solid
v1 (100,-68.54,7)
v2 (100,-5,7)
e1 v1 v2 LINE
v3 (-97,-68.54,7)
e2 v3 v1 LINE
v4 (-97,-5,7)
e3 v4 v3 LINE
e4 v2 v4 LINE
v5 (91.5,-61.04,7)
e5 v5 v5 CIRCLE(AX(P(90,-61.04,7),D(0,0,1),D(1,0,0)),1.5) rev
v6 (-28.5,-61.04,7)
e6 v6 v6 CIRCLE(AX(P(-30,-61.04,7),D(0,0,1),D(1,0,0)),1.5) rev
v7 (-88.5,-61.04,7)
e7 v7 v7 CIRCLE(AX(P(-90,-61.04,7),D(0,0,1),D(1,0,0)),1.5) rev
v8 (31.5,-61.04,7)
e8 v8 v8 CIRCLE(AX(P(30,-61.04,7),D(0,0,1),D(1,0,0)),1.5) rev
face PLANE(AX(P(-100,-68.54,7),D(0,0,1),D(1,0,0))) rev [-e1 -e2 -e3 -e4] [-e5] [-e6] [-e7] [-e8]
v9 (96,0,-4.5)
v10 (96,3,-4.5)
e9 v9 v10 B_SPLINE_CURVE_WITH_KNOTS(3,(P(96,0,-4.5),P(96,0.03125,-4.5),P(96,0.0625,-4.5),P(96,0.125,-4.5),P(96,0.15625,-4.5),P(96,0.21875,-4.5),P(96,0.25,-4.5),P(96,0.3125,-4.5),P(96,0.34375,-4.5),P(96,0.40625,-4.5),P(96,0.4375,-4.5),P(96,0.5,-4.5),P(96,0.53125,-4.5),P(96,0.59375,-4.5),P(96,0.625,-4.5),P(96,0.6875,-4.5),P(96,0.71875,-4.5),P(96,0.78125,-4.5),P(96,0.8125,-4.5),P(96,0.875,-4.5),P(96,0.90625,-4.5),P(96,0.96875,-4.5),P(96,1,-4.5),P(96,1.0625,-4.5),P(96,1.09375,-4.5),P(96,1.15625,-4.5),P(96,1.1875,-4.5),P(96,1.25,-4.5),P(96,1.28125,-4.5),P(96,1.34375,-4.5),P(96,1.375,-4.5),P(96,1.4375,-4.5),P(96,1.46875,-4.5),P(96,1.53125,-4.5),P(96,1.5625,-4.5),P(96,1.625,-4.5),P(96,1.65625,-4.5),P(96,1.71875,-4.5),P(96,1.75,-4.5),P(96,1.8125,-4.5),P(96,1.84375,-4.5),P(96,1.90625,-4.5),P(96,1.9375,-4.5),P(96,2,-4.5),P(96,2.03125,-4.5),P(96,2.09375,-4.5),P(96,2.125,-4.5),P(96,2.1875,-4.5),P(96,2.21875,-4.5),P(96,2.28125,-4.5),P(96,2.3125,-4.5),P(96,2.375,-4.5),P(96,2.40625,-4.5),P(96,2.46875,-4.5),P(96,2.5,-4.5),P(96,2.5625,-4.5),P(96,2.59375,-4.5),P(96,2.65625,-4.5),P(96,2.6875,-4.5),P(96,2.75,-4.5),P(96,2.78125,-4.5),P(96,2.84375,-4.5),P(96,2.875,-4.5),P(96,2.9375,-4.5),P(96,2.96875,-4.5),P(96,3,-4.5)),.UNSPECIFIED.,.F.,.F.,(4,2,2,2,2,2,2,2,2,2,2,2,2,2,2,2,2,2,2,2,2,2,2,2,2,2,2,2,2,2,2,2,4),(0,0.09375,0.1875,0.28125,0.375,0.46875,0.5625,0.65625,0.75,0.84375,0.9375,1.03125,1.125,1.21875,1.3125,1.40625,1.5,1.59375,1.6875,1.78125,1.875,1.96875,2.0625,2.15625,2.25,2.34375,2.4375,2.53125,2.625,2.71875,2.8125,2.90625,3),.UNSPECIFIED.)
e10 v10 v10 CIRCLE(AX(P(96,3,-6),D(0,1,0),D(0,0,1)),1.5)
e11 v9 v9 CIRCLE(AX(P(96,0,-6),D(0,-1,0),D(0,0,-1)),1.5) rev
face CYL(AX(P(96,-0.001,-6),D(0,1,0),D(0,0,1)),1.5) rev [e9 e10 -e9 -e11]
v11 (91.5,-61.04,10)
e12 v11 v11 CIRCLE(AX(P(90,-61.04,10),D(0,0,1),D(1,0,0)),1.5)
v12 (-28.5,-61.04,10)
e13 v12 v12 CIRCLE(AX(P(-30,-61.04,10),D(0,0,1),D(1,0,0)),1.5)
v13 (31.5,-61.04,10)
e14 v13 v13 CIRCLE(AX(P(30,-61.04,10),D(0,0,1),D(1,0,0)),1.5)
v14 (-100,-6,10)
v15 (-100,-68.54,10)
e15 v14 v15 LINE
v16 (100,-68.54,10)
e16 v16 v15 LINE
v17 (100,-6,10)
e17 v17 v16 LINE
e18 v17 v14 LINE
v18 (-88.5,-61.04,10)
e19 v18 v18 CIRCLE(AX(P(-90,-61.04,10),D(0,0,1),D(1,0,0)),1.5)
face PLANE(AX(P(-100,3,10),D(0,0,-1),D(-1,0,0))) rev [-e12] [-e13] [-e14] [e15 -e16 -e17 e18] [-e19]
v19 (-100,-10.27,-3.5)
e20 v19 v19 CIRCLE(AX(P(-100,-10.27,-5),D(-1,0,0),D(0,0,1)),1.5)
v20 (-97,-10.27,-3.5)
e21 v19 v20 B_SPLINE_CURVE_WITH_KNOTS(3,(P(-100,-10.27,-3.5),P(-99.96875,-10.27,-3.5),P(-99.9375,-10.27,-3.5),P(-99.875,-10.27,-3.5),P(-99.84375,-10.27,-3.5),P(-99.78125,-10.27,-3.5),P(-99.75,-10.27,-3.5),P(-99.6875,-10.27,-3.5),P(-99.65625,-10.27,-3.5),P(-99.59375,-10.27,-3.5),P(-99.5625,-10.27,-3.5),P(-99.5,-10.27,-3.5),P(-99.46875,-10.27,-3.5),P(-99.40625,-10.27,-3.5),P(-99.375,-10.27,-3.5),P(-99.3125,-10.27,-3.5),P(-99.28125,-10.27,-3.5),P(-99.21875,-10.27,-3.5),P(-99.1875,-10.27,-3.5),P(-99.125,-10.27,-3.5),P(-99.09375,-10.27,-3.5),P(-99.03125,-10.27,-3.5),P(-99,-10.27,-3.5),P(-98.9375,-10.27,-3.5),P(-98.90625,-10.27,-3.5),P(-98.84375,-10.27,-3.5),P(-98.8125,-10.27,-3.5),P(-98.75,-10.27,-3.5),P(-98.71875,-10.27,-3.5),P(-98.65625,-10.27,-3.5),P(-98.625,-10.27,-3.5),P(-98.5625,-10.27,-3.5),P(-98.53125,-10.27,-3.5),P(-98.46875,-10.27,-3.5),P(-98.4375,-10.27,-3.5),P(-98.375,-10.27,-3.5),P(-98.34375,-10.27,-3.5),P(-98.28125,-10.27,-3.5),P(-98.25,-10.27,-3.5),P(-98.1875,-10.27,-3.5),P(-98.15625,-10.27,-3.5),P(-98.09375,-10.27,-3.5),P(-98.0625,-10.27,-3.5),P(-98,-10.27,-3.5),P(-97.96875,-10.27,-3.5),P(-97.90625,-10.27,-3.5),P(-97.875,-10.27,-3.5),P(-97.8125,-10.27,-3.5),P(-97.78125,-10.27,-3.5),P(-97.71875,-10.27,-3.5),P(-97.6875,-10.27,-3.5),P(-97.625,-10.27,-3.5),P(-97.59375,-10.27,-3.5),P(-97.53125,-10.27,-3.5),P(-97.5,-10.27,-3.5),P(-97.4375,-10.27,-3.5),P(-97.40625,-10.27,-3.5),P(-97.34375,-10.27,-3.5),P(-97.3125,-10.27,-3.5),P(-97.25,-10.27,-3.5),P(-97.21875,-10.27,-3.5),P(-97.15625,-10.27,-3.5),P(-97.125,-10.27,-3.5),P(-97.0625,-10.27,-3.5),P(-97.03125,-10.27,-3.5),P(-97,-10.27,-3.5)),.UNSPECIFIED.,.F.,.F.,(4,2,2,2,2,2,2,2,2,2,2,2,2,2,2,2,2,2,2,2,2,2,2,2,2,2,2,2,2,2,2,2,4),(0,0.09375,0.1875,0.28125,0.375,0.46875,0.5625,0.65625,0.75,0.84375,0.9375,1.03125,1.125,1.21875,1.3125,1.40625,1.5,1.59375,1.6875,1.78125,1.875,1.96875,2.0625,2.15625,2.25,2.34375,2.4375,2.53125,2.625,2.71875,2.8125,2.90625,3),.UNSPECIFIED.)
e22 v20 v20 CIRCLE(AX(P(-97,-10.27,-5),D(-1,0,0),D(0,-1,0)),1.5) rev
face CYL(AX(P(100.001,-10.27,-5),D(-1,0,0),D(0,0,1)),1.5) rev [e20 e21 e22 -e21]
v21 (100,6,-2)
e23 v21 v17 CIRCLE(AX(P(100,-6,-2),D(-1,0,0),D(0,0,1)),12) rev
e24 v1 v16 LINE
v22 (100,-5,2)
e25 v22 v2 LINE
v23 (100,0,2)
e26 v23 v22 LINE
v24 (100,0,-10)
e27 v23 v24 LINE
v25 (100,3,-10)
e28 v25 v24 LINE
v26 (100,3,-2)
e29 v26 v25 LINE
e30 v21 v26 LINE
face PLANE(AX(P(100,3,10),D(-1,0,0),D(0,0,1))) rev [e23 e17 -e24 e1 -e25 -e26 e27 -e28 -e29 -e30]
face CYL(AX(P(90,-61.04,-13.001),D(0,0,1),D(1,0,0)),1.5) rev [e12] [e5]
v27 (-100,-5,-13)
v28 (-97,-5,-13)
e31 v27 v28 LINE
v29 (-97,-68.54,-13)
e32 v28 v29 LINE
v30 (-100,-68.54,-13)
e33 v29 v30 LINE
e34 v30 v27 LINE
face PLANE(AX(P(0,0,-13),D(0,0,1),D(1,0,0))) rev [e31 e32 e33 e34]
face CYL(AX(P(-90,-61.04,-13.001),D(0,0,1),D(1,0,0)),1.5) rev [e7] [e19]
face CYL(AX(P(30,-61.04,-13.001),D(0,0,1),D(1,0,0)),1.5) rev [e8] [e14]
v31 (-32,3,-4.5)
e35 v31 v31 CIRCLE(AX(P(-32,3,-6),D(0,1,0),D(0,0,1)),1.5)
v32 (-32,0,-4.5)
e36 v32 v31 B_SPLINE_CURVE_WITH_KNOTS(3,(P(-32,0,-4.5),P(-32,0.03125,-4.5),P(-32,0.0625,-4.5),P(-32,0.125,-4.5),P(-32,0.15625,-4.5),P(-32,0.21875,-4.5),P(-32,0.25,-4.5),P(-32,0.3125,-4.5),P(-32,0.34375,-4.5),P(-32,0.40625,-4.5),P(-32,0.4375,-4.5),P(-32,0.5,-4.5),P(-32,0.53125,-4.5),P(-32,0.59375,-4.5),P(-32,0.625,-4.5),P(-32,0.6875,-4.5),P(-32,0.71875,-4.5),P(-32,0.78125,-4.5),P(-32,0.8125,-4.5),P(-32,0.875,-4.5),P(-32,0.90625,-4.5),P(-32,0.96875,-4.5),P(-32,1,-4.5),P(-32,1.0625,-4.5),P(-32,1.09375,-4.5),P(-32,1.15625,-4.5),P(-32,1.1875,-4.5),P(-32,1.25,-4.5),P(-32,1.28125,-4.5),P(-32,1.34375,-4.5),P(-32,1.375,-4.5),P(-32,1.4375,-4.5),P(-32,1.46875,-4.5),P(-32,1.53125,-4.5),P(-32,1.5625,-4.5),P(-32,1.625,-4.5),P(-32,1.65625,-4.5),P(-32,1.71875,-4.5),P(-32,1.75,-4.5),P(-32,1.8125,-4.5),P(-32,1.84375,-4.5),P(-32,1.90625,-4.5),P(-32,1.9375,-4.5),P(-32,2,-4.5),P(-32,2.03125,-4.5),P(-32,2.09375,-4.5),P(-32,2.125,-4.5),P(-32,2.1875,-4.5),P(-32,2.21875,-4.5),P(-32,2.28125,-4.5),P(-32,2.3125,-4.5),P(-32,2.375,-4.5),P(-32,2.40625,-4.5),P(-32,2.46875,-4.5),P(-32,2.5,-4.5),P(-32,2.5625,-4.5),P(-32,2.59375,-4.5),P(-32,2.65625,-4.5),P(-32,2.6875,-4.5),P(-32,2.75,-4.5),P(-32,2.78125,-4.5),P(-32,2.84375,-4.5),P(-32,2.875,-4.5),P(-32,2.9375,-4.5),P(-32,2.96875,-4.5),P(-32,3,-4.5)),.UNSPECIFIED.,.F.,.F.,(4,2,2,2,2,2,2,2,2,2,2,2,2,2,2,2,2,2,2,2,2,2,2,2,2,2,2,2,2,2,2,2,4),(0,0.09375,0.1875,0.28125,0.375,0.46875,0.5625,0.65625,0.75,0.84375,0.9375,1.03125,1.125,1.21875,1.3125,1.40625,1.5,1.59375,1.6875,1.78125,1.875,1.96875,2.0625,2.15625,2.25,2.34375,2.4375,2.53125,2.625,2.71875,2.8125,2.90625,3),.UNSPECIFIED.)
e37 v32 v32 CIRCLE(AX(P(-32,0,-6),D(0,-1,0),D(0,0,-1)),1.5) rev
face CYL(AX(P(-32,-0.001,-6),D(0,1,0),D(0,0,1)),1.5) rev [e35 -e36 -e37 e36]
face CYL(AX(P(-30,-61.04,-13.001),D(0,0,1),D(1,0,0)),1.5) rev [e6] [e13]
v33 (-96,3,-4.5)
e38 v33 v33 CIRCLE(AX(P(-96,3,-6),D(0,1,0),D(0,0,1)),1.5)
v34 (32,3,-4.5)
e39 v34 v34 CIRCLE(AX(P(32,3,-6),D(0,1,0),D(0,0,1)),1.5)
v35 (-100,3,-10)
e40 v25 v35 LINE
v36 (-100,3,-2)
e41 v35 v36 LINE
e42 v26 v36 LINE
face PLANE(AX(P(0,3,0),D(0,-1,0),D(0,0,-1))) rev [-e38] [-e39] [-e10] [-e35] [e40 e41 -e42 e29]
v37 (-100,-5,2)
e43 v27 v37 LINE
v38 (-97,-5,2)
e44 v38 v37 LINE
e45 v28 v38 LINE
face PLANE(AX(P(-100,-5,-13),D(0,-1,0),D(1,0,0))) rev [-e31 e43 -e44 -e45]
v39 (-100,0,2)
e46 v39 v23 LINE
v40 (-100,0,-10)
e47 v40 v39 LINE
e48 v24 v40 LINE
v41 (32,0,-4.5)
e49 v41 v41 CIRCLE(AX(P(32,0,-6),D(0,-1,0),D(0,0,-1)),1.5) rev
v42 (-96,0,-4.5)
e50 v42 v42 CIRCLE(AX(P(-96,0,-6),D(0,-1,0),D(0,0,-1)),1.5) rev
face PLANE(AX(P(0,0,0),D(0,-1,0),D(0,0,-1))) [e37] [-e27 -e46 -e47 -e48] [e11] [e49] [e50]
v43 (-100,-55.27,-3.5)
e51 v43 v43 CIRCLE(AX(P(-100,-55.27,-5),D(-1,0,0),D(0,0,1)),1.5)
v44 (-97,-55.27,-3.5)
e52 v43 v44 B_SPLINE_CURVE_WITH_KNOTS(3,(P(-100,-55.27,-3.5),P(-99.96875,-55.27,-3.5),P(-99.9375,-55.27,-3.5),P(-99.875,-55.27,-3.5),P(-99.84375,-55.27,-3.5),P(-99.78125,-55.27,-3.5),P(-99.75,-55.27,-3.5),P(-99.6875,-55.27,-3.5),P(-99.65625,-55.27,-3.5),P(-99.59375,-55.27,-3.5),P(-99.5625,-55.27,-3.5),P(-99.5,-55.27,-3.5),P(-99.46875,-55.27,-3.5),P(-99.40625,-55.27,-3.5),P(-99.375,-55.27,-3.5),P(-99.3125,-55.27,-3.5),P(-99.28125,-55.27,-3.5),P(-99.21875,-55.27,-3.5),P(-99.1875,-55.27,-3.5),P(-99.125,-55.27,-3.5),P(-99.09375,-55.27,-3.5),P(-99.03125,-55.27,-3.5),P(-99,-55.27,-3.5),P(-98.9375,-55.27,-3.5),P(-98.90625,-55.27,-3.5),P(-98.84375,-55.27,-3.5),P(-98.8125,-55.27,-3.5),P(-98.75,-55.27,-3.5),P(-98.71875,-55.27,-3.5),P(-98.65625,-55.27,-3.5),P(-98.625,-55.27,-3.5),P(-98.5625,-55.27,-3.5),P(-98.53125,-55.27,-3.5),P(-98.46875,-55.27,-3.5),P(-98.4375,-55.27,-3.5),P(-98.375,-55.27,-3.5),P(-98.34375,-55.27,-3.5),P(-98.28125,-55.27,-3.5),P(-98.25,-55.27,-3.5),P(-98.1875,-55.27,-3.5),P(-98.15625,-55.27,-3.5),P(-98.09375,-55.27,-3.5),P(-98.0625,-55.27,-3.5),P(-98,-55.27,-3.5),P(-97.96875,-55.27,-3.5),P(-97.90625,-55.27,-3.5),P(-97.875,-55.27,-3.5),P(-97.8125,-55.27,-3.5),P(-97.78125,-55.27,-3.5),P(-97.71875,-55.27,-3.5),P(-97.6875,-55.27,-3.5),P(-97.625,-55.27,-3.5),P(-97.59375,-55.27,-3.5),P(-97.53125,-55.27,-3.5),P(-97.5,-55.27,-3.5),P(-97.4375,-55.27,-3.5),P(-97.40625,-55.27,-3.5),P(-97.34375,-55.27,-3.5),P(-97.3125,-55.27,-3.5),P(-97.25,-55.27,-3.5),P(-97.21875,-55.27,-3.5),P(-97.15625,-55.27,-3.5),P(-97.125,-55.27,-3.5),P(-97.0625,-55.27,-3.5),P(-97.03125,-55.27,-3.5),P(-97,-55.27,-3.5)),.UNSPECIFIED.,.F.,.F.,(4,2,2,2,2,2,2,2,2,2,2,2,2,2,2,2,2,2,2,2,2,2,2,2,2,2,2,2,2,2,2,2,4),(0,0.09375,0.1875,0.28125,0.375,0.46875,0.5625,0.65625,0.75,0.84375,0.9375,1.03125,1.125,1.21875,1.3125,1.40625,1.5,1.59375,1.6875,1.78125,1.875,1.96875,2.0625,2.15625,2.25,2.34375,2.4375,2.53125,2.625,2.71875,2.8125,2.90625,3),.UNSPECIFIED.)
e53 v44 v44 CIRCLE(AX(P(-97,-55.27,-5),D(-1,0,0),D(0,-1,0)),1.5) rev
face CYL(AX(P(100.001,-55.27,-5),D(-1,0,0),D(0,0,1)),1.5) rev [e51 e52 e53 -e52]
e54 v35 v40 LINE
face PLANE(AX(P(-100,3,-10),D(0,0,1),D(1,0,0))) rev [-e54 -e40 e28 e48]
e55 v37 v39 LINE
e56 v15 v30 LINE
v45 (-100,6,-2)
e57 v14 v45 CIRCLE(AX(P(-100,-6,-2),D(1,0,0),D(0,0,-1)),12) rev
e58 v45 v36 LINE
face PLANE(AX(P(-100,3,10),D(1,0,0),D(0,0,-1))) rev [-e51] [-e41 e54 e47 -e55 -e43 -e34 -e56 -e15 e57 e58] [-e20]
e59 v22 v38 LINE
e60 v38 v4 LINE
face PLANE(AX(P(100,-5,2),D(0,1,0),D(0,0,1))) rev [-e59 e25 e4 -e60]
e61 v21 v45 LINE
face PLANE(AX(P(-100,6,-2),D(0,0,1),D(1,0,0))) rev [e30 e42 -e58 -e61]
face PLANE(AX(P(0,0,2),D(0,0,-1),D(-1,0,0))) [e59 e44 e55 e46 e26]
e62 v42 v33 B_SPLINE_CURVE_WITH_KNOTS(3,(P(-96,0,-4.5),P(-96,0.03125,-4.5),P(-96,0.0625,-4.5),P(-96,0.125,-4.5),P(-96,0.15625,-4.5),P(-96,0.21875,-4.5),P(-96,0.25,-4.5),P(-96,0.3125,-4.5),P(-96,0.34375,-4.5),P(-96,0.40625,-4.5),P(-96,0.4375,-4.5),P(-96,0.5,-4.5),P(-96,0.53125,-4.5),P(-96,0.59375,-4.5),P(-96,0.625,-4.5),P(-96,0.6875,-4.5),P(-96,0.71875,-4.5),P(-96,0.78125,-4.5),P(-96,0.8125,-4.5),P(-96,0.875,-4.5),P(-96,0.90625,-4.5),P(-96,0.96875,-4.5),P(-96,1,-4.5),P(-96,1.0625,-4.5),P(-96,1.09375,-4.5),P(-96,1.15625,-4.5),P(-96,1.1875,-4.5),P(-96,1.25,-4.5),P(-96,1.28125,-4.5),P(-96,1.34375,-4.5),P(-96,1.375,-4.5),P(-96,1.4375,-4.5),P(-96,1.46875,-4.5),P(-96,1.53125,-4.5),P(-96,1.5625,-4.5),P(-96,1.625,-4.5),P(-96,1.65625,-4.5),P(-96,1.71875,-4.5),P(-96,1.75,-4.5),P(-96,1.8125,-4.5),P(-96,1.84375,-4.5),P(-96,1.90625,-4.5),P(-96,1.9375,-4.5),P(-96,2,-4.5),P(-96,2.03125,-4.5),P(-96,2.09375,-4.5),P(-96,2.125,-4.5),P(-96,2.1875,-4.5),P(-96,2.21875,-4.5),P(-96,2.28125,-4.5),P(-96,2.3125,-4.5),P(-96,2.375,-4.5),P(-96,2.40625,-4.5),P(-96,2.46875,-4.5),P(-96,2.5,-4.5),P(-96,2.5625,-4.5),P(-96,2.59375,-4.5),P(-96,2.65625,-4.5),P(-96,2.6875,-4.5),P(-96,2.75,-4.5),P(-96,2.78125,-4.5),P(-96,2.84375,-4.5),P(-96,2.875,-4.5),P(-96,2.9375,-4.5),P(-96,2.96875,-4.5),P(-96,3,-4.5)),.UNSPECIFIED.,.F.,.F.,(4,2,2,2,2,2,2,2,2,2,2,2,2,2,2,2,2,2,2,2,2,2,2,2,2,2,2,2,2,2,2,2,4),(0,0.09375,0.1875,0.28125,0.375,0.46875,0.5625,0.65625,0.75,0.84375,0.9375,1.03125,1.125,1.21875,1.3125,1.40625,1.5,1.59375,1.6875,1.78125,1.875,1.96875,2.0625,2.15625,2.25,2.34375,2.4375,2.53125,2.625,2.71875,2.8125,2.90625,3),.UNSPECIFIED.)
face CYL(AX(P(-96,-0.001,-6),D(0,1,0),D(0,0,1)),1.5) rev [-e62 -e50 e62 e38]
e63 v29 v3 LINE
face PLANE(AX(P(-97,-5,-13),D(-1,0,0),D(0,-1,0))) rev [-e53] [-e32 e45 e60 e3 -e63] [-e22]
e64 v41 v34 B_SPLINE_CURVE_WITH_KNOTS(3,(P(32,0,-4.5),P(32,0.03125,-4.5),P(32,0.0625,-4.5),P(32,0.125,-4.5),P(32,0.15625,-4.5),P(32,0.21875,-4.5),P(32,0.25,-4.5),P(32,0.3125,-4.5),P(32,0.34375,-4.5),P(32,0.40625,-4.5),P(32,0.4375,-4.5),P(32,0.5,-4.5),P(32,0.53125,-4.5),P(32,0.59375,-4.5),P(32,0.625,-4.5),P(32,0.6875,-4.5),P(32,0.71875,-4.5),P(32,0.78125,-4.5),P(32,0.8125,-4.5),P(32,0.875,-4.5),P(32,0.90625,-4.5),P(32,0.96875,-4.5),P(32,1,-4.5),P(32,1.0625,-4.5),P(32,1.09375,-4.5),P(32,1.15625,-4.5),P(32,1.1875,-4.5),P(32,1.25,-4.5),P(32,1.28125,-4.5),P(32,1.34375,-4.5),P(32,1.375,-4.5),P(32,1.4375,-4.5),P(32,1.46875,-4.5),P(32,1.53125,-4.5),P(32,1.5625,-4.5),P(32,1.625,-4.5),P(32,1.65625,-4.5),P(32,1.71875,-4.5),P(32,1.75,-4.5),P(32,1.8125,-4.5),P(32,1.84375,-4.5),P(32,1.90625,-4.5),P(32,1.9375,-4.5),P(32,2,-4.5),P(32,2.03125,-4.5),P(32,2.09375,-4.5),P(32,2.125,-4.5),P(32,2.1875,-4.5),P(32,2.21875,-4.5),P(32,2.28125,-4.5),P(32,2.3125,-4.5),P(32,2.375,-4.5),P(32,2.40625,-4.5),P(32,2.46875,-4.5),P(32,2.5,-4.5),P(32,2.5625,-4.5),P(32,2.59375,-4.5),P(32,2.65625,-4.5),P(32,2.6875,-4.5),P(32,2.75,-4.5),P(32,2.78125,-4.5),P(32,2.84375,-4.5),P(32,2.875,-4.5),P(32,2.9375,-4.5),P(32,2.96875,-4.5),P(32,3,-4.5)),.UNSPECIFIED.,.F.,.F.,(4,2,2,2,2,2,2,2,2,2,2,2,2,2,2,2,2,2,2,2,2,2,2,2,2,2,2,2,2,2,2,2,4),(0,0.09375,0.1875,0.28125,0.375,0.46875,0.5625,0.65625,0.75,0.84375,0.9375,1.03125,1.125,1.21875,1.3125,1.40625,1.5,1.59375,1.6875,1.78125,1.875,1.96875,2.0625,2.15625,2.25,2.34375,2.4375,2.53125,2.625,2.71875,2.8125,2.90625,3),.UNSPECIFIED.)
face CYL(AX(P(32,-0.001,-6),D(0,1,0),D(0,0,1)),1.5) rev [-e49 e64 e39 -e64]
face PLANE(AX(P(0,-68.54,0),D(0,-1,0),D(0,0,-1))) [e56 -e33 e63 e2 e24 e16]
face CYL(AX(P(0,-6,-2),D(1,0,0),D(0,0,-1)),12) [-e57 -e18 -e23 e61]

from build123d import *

# Parameters (mm, degrees)
SKETCH1_W           = 200
SKETCH1_H           = 20
BOSS_EXTRUDE1_DEPTH = 3
CUT_EXTRUDE1_REACH  = 102.544
SKETCH2_R           = 1.5
LPATTERN1_COUNT     = 4
LPATTERN1_PITCH     = 64
SKETCH3_W           = 200
SKETCH3_H           = 3
BOSS_EXTRUDE2_DEPTH = 68.54
SKETCH4_W           = 200
SKETCH4_H           = 5
BOSS_EXTRUDE3_DEPTH = 5
SKETCH5_W           = 200
SKETCH5_H           = 12
BOSS_EXTRUDE4_DEPTH = 3
FILLET4_R           = 12
SKETCH6_W           = 3
SKETCH6_H           = 63.54
BOSS_EXTRUDE5_DEPTH = 20
CUT_EXTRUDE2_REACH  = 213.818
SKETCH7_R           = 1.5
CUT_EXTRUDE3_REACH  = 125.397
SKETCH8_R           = 1.5
LPATTERN2_COUNT     = 4
LPATTERN2_PITCH     = 60


with BuildPart() as part:
    # Sketch1 → Boss-Extrude1 (new body)
    with BuildSketch(Plane(origin=(0, 0, 0), x_dir=(1, 0, 0), z_dir=(0, 1, 0))):
        Rectangle(SKETCH1_W, SKETCH1_H)
    extrude(amount=BOSS_EXTRUDE1_DEPTH)

    # Sketch2 → Cut-Extrude1 (cut, up to next)
    with BuildSketch(Plane(origin=(0, 3, 0), x_dir=(1, 0, 0), z_dir=(0, 1, 0)), mode=Mode.PRIVATE) as cut_extrude1_sk1:
        with Locations(Location((-96, 6, 0), (0, 0, 270))):
            Circle(SKETCH2_R)
    cut_extrude1_tool1 = extrude(cut_extrude1_sk1.sketch, amount=-CUT_EXTRUDE1_REACH, mode=Mode.PRIVATE) & part.part
    cut_extrude1 = cut_extrude1_tool1.solids().sort_by_distance((-96, 3, -6))[0]
    add(cut_extrude1, mode=Mode.SUBTRACT)

    # LPattern1: Cut-Extrude1 ×4
    with Locations(*[(i * LPATTERN1_PITCH, 0, 0) for i in range(1, LPATTERN1_COUNT)]):
        add(cut_extrude1, mode=Mode.SUBTRACT)

    # Sketch3 → Boss-Extrude2 (add)
    with BuildSketch(Plane.XZ):
        with Locations((0, 8.5)):
            Rectangle(SKETCH3_W, SKETCH3_H)
    extrude(amount=BOSS_EXTRUDE2_DEPTH)

    # Sketch4 → Boss-Extrude3 (add)
    with BuildSketch(Plane(origin=(0, 0, 7), x_dir=(-1, 0, 0), z_dir=(0, 0, -1))):
        with Locations((0, -2.5)):
            Rectangle(SKETCH4_W, SKETCH4_H)
    extrude(amount=BOSS_EXTRUDE3_DEPTH)

    # Sketch5 → Boss-Extrude4 (add)
    with BuildSketch(Plane(origin=(0, 3, 0), x_dir=(1, 0, 0), z_dir=(0, 1, 0))):
        with Locations((0, -4)):
            Rectangle(SKETCH5_W, SKETCH5_H)
    extrude(amount=BOSS_EXTRUDE4_DEPTH)

    # Fillet4
    fillet4_edges = [part.edges().sort_by_distance(p)[0] for p in [
        (0, 6, 10),
    ]]
    fillet(fillet4_edges, radius=FILLET4_R - 0.0001)  # a hair under: the kernel refuses the full size

    # Sketch6 → Boss-Extrude5 (add)
    with BuildSketch(Plane(origin=(0, 0, 7), x_dir=(-1, 0, 0), z_dir=(0, 0, -1))):
        with Locations((98.5, -36.77)):
            Rectangle(SKETCH6_W, SKETCH6_H)
    extrude(amount=BOSS_EXTRUDE5_DEPTH)

    # Sketch7 → Cut-Extrude2 (cut, up to next)
    with BuildSketch(Plane.ZY.offset(100), mode=Mode.PRIVATE) as cut_extrude2_sk1:
        with Locations((-5, -10.27)):
            Circle(SKETCH7_R)
    cut_extrude2_tool1 = extrude(cut_extrude2_sk1.sketch, amount=-CUT_EXTRUDE2_REACH, mode=Mode.PRIVATE) & part.part
    # Sketch7 → Cut-Extrude2 (cut, up to next)
    with BuildSketch(Plane.ZY.offset(100), mode=Mode.PRIVATE) as cut_extrude2_sk2:
        with Locations((-5, -55.27)):
            Circle(SKETCH7_R)
    cut_extrude2_tool2 = extrude(cut_extrude2_sk2.sketch, amount=-CUT_EXTRUDE2_REACH, mode=Mode.PRIVATE) & part.part
    add(cut_extrude2_tool1.solids().sort_by_distance((-100, -10.27, -5))[0], mode=Mode.SUBTRACT)
    add(cut_extrude2_tool2.solids().sort_by_distance((-100, -55.27, -5))[0], mode=Mode.SUBTRACT)

    # Sketch8 → Cut-Extrude3 (cut, up to next)
    with BuildSketch(Plane.XY.offset(10), mode=Mode.PRIVATE) as cut_extrude3_sk1:
        with Locations((-90, -61.04)):
            Circle(SKETCH8_R)
    cut_extrude3_tool1 = extrude(cut_extrude3_sk1.sketch, amount=-CUT_EXTRUDE3_REACH, mode=Mode.PRIVATE) & part.part
    cut_extrude3 = cut_extrude3_tool1.solids().sort_by_distance((-90, -61.04, 10))[0]
    add(cut_extrude3, mode=Mode.SUBTRACT)

    # LPattern2: Cut-Extrude3 ×4
    with Locations(*[(i * LPATTERN2_PITCH, 0, 0) for i in range(1, LPATTERN2_COUNT)]):
        add(cut_extrude3, mode=Mode.SUBTRACT)


solid = part.part
